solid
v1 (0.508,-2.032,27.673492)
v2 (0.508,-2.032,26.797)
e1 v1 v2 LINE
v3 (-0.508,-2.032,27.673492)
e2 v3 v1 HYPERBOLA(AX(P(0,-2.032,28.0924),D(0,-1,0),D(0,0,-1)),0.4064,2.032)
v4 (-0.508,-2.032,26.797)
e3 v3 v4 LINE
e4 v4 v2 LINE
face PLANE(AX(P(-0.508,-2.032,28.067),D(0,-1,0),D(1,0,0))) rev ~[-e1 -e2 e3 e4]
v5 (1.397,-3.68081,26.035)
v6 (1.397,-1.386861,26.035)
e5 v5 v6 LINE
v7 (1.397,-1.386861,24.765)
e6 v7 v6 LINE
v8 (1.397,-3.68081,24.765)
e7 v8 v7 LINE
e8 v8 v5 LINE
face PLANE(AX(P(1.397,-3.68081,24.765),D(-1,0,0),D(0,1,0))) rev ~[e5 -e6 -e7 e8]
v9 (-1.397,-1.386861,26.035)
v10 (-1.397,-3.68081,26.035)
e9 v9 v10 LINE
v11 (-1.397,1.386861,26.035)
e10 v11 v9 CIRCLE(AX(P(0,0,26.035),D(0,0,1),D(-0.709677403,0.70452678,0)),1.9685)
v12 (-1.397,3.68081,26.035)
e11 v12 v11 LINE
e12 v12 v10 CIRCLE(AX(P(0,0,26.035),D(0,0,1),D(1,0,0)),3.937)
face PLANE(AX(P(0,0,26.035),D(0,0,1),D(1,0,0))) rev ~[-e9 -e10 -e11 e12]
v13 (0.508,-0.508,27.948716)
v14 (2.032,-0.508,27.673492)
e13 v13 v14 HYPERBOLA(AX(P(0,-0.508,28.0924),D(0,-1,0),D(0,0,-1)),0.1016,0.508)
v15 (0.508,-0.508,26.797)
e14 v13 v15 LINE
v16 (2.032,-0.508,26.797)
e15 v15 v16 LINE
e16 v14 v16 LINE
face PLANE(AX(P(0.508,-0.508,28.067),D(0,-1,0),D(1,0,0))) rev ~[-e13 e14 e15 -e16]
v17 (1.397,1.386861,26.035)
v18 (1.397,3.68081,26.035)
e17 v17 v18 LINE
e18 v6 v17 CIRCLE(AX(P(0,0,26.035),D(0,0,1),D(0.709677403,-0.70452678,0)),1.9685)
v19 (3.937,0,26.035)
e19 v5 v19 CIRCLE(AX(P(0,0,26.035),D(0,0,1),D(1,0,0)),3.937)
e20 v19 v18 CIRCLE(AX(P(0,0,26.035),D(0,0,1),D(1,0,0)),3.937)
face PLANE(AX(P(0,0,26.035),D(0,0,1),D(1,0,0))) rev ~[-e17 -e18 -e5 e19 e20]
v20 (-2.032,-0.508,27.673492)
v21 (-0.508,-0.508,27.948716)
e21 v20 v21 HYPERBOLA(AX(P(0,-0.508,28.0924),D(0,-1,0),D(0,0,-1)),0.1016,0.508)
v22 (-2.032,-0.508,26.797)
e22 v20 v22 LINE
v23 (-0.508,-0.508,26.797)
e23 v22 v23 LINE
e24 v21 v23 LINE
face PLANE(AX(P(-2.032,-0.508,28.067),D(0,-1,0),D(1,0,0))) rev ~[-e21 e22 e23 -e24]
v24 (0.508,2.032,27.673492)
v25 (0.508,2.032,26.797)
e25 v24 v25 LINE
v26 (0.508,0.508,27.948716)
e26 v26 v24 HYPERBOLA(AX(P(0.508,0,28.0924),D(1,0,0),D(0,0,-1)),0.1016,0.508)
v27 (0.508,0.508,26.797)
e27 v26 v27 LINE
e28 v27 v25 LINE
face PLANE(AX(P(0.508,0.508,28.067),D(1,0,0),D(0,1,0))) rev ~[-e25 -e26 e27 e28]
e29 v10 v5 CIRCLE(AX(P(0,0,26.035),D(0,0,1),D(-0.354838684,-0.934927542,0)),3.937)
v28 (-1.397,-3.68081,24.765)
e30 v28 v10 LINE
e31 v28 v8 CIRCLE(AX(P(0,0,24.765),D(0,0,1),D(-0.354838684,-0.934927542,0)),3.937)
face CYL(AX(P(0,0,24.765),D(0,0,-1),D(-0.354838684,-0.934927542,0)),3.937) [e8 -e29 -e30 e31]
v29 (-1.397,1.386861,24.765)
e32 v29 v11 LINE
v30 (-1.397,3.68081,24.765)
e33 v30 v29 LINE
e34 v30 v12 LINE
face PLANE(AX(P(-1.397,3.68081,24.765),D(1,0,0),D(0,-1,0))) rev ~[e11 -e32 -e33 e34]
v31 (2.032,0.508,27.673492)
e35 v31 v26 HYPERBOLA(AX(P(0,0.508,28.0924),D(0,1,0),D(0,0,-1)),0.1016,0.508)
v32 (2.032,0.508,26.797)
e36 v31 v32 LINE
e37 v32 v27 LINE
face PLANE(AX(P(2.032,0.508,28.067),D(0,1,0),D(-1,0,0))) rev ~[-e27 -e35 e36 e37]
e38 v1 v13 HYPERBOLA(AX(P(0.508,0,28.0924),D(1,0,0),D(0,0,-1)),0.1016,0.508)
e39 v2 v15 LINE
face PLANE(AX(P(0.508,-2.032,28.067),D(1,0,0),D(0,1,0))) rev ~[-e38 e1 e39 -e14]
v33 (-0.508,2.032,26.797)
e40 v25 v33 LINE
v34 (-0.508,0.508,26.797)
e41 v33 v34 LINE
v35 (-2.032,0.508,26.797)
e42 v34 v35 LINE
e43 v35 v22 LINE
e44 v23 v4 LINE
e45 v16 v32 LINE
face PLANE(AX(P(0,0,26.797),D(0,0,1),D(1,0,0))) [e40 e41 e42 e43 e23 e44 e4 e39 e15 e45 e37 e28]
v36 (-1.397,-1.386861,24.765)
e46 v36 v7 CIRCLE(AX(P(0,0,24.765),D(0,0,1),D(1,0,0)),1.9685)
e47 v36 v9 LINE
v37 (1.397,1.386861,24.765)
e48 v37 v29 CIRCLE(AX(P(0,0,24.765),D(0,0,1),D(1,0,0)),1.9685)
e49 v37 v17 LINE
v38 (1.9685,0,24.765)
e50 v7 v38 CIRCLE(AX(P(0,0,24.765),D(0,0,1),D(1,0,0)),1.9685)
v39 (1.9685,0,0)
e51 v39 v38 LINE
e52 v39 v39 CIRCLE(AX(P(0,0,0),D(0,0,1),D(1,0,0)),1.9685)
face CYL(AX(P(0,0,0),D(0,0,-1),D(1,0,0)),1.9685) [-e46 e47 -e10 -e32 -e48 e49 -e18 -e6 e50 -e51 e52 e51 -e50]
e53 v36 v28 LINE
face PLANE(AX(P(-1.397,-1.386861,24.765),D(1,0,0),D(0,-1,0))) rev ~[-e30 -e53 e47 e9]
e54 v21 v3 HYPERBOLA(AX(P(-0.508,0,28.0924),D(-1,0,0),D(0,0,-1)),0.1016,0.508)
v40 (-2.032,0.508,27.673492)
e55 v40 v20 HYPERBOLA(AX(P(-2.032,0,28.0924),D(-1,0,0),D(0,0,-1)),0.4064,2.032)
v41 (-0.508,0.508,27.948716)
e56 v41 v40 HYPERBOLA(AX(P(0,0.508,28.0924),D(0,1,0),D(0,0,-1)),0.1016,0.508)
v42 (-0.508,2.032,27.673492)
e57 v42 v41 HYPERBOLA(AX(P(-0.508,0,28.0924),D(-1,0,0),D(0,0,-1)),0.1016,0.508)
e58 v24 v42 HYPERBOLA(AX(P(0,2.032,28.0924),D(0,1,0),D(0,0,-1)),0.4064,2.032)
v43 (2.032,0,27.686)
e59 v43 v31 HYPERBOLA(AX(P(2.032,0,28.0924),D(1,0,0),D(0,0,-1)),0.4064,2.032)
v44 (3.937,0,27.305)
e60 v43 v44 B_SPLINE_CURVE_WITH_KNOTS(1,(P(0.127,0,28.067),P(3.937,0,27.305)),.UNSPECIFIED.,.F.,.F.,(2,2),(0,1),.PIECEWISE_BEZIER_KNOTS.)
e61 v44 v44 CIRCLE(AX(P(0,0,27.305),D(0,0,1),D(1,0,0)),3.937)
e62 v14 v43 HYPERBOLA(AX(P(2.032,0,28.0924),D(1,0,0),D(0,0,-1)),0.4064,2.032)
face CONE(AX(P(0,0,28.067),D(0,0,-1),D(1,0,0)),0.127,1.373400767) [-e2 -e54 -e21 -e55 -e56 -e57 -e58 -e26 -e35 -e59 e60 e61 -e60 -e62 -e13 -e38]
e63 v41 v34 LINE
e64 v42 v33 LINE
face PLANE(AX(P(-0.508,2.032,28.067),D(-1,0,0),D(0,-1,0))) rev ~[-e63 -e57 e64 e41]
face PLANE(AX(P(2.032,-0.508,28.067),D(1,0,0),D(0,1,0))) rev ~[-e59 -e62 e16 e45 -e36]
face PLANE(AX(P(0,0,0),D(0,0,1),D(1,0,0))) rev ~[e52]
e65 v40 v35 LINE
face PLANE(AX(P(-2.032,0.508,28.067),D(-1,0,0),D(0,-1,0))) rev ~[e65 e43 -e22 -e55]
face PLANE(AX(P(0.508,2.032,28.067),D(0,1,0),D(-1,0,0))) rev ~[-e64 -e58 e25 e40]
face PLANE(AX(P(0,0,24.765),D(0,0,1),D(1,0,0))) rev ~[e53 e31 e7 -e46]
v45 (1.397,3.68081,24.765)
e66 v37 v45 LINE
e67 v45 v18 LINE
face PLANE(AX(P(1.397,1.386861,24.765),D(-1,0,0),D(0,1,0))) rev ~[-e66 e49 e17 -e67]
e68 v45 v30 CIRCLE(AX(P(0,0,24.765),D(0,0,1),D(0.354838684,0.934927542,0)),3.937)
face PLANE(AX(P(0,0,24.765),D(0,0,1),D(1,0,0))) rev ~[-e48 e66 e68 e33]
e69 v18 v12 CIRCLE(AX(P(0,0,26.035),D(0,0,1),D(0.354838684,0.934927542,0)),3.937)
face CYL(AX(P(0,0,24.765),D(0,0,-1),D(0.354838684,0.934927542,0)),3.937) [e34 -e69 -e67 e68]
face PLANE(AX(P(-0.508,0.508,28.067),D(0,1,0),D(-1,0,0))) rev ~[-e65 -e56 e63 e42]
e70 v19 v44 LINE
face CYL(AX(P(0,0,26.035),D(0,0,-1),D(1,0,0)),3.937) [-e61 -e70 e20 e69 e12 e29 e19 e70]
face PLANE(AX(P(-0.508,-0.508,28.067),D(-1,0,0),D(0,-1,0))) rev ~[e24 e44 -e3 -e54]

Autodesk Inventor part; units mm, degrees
ref_plane "YZ Plane" through (0, 0, 0) normal (1, 0, 0) x (0, 1, 0)
ref_plane "XZ Plane" through (0, 0, 0) normal (0, 1, 0) x (-1, 0, 0)
sketch "Sketch1" plane through (0, 0, 0) normal (0, 0, 1) x (1, 0, 0)
  circle A0 centre (0, 0) radius 1.9685
  dimension "d0" = 3.937
sketch "Sketch1 outline for Extrusion1" plane through (0, 0, 0) normal (0, 0, 1) x (1, 0, 0)
  circle A0 centre (0, 0) radius 1.9685
extrude "Extrusion1" add sketch "Sketch1 outline for Extrusion1" along normal blind 24.765
sketch "Sketch2" plane through (0, 0, 24.765) normal (0, 0, 1) x (1, 0, 0)
  circle A0 centre (0, 0) radius 1.9685
  line L0 (-1.397, 3.68081) -> (-1.397, 1.386861)
  line L1 (1.397, 3.68081) -> (1.397, 1.386861)
  line L2 (1.397, -3.68081) -> (1.397, -1.386861)
  line L3 (-1.397, -3.68081) -> (-1.397, -1.386861)
  arc A1 (1.397, 3.68081) -> (-1.397, 3.68081) centre (0, 0) ccw
  arc A2 (-1.397, -3.68081) -> (1.397, -3.68081) centre (0, 0) ccw
  arc A3 (-1.397, 1.386861) -> (-1.397, -1.386861) centre (0, 0) ccw
  arc A4 (1.397, -1.386861) -> (1.397, 1.386861) centre (0, 0) ccw
  point P0 (0, 1.9685)
  point P1 (0, -1.9685)
  point P2 (1.397, 1.9685)
  point P3 (-1.397, 1.9685)
  point P4 (1.397, -1.9685)
  point P5 (-1.397, -1.9685)
  dimension "d6" = 1.397
  dimension "d7" = 1.397
  dimension "d8" = 1.397
  dimension "d9" = 1.397
sketch "Sketch2 outline for Extrusion2" plane through (0, 0, 24.765) normal (0, 0, 1) x (1, 0, 0)
  arc A0 (1.397, 3.68081) -> (-1.397, 3.68081) centre (0, 0) ccw
  line L0 (-1.397, 3.68081) -> (-1.397, 1.386861)
  arc A1 (-1.397, 1.386861) -> (-1.397, -1.386861) centre (0, 0) ccw
  line L1 (-1.397, -1.386861) -> (-1.397, -3.68081)
  arc A2 (-1.397, -3.68081) -> (1.397, -3.68081) centre (0, 0) ccw
  line L2 (1.397, -3.68081) -> (1.397, -1.386861)
  arc A3 (1.397, -1.386861) -> (1.397, 1.386861) centre (0, 0) ccw
  line L3 (1.397, 1.386861) -> (1.397, 3.68081)
extrude "Extrusion2" add sketch "Sketch2 outline for Extrusion2" along normal blind 1.27
sketch "Sketch3" plane through (0, 0, 26.035) normal (0, 0, 1) x (1, 0, 0)
  arc A0 (1.397, 3.68081) -> (-1.397, 3.68081) centre (0, 0) ccw
  circle A1 centre (0, 0) radius 3.937
sketch "Sketch3 outline for Extrusion3" plane through (0, 0, 26.035) normal (0, 0, 1) x (1, 0, 0)
  circle A0 centre (0, 0) radius 3.937
extrude "Extrusion3" add sketch "Sketch3 outline for Extrusion3" along normal blind 1.27
ref_plane "Work Plane1" through (0, 0, 28.067) normal (0, 0, 1) x (1, 0, 0)
sketch "Sketch4" plane through (0, 0, 28.067) normal (0, 0, 1) x (1, 0, 0)
  circle A0 centre (0, 0) radius 0.127
  dimension "d15" = 0.254
sketch "Sketch4 outline for Loft1" plane through (0, 0, 28.067) normal (0, 0, 1) x (1, 0, 0)
  circle A0 centre (0, 0) radius 0.127
loft "Loft1" add profiles "Sketch4 outline for Loft1" section 2 edges at (-3.937, 0, 27.305)
sketch "Sketch5" plane through (0, 0, 28.067) normal (0, 0, 1) x (1, 0, 0)
  circle A0 centre (0, 0) radius 0.127 projected
  line L0 (-0.508, 2.032) -> (0.508, 2.032)
  line L1 (0.508, 2.032) -> (0.508, 0.508)
  line L2 (0.508, 0.508) -> (2.032, 0.508)
  line L3 (2.032, 0.508) -> (2.032, -0.508)
  line L4 (2.032, -0.508) -> (0.508, -0.508)
  line L5 (0.508, -0.508) -> (0.508, -2.032)
  line L6 (0.508, -2.032) -> (-0.508, -2.032)
  line L7 (-0.508, -2.032) -> (-0.508, -0.508)
  line L8 (-0.508, -0.508) -> (-2.032, -0.508)
  line L9 (-2.032, -0.508) -> (-2.032, 0.508)
  line L10 (-2.032, 0.508) -> (-0.508, 0.508)
  line L11 (-0.508, 0.508) -> (-0.508, 2.032)
  dimension "d22" = 0.508
  dimension "d23" = 0.508
  dimension "d24" = 0.508
  dimension "d25" = 0.508
  dimension "d26" = 2.032
  dimension "d27" = 2.032
  dimension "d28" = 2.032
  dimension "d29" = 2.032
  dimension "d30" = 2.032
  dimension "d31" = 2.032
  dimension "d32" = 2.032
  dimension "d33" = 2.032
sketch "Sketch5 outline for Extrusion4" plane through (0, 0, 28.067) normal (0, 0, 1) x (1, 0, 0)
  line L0 (2.032, 0.508) -> (0.508, 0.508)
  line L1 (2.032, -0.508) -> (2.032, 0.508)
  line L2 (0.508, -0.508) -> (2.032, -0.508)
  line L3 (0.508, -2.032) -> (0.508, -0.508)
  line L4 (-0.508, -2.032) -> (0.508, -2.032)
  line L5 (-0.508, -0.508) -> (-0.508, -2.032)
  line L6 (-2.032, -0.508) -> (-0.508, -0.508)
  line L7 (-2.032, 0.508) -> (-2.032, -0.508)
  line L8 (-0.508, 0.508) -> (-2.032, 0.508)
  line L9 (-0.508, 2.032) -> (-0.508, 0.508)
  line L10 (0.508, 2.032) -> (-0.508, 2.032)
  line L11 (0.508, 0.508) -> (0.508, 2.032)
extrude "Extrusion4" cut sketch "Sketch5 outline for Extrusion4" against normal blind 1.27
thread "Thread1" size "6-32 UNC" class "2A" standard "ANSI Unified Screw Threads" full length
properties part number "Prop Screw" material "Stainless Steel"
